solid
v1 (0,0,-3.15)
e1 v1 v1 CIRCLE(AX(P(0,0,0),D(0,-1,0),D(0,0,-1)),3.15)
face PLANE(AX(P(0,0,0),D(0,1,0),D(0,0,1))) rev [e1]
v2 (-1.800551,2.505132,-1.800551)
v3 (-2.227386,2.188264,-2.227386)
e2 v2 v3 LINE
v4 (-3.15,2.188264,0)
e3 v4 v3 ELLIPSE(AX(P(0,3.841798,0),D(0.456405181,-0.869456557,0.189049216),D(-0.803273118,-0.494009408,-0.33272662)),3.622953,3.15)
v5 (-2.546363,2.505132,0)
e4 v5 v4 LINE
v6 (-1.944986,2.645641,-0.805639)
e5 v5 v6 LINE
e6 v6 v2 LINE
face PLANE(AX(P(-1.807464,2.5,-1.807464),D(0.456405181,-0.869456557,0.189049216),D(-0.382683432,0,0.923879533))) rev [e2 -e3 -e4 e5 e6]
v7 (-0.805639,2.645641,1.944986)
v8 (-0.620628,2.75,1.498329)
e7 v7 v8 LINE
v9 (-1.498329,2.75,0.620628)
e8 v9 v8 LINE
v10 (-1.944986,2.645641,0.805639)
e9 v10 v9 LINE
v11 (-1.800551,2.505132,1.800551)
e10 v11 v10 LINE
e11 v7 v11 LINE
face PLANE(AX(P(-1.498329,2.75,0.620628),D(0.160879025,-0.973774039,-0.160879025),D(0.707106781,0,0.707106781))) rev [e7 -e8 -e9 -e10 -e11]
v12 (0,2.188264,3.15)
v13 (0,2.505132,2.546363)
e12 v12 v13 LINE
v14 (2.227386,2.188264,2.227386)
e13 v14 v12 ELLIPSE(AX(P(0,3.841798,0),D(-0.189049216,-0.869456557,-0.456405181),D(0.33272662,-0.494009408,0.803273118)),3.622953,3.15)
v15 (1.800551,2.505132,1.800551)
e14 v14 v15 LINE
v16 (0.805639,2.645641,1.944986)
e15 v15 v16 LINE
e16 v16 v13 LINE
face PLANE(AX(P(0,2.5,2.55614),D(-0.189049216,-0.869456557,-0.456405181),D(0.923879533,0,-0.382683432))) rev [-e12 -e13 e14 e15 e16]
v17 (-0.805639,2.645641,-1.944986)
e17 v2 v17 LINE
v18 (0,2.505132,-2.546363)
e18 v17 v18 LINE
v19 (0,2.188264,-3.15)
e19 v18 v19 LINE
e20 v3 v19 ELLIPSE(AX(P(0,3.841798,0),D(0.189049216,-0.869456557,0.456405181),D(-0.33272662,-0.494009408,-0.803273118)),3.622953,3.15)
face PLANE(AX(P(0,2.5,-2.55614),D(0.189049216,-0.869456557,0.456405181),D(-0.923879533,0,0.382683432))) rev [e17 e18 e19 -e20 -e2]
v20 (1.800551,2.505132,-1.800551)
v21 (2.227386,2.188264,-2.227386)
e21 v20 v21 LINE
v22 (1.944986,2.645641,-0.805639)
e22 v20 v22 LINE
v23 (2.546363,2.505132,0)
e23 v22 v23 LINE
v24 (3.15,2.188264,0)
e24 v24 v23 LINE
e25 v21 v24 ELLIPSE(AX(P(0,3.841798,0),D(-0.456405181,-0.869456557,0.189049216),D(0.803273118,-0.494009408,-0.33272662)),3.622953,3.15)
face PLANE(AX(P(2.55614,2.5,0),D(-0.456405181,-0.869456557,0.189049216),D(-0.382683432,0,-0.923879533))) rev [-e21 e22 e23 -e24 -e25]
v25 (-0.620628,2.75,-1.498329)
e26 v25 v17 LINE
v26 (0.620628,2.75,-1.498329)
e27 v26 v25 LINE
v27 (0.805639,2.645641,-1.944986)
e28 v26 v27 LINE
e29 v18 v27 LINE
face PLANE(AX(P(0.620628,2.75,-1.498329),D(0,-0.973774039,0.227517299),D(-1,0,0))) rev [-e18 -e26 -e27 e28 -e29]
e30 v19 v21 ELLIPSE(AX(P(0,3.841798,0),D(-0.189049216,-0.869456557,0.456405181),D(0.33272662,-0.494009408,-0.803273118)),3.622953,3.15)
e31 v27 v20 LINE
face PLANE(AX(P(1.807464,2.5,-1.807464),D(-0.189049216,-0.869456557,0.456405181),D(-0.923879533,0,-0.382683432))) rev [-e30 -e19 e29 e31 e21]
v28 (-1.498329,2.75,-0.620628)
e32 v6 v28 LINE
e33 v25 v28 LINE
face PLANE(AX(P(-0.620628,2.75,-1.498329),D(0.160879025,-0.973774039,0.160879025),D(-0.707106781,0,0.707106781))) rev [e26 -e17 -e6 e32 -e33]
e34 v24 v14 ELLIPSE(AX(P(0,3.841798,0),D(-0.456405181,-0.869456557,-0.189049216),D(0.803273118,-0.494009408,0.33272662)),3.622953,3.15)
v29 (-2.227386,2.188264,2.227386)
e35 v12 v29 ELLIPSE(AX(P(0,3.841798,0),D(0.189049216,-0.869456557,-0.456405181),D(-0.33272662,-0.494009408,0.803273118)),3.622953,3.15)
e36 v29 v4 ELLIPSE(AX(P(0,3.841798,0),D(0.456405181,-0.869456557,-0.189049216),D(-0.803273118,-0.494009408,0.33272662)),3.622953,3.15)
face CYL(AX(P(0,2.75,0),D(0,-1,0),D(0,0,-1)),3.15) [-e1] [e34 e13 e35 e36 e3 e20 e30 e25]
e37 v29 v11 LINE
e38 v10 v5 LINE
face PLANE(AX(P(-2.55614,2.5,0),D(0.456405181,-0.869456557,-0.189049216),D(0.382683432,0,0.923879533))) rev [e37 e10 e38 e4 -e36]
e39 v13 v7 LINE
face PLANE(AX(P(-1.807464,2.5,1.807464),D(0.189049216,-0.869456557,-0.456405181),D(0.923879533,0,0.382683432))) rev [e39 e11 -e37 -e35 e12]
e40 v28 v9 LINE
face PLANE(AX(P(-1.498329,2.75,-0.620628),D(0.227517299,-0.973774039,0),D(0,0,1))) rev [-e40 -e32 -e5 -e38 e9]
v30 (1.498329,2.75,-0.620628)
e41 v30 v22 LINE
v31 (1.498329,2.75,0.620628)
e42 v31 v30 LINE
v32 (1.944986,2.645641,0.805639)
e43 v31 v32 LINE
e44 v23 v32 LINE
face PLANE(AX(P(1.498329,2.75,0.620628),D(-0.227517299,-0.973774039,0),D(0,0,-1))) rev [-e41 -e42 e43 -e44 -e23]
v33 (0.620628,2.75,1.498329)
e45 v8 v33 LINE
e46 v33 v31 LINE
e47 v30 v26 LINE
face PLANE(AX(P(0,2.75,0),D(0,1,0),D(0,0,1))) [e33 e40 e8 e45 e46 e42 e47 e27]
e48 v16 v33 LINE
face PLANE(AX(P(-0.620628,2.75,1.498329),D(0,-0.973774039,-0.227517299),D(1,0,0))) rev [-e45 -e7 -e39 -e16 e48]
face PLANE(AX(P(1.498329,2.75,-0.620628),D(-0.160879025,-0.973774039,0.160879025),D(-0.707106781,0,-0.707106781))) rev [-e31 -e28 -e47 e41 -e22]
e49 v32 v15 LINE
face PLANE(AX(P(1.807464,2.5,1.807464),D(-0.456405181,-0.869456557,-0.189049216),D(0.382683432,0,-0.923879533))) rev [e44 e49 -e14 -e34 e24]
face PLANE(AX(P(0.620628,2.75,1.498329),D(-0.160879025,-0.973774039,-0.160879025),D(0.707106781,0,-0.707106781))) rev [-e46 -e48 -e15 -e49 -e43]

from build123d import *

# Parameters (mm, degrees)
SKETCH1_R           = 3.25
BOSS_EXTRUDE1_DEPTH = 4
BOSS_EXTRUDE2_DEPTH = 1
CHAMFER1_SIZE       = 0.88
CHAMFER1_SIZE_2     = 1
BOSS_EXTRUDE3_DEPTH = 0.5
CHAMFER2_SIZE       = 1.07
CHAMFER2_SIZE_2     = 0.5
SCALE1_SCALE_X      = 1
SCALE1_SCALE_Y      = 0.5
SCALE1_SCALE_Z      = 1
SKETCH4_R           = 3.45
SKETCH4_R_2         = 3.15
CUT_EXTRUDE1_DEPTH  = 6.356071494


with BuildPart() as part:
    # Sketch1 → Boss-Extrude1 (new body)
    with BuildSketch(Plane(origin=(0, 0, 0), x_dir=(1, 0, 0), z_dir=(0, 1, 0))):
        with Locations(Location((0, 0, 0), (0, 0, 270))):
            Circle(SKETCH1_R)
    extrude(amount=BOSS_EXTRUDE1_DEPTH)

    # Sketch2 → Boss-Extrude2 (add)
    with BuildSketch(Plane(origin=(0, 4, 0), x_dir=(1, 0, 0), z_dir=(0, 1, 0))):
        Polygon((0, 2.556139813), (-1.807463795, 1.807463795), (-2.556139813, 0), (-1.807463795, -1.807463795), (0, -2.556139813), (1.807463795, -1.807463795), (2.556139813, 0), (1.807463795, 1.807463795), align=None)
    extrude(amount=BOSS_EXTRUDE2_DEPTH)

    # Chamfer1
    # the kernel refuses this chamfer: 1, 0.88 mm, written as the material it adds along each edge
    with BuildSketch(Plane(origin=(-4.18730229, 4, 0.821702415), x_dir=(-0.38268343236508967, 0, 0.9238795325112867), z_dir=(0.9238795325112868, 0, 0.38268343236508967))) as chamfer1_piece_1_section:
        Polygon((CHAMFER1_SIZE, 0), (0, -CHAMFER1_SIZE_2), (0, 0), align=None)
    chamfer1_piece_1 = extrude(amount=7.108221963, mode=Mode.PRIVATE)
    chamfer1_piece_1 = chamfer1_piece_1 & Plane(origin=(0, 4, 0), x_dir=(0, 0, 1), z_dir=(0, -1, 0)) * Cylinder(3.25, 19, mode=Mode.PRIVATE)
    chamfer1_piece_1 = split(chamfer1_piece_1, bisect_by=Plane(origin=(-2.504502352, 4, 0.124663858), z_dir=(0.9238795325112868, 0, -0.38268343236508956)), keep=Keep.TOP, mode=Mode.PRIVATE)
    chamfer1_piece_1 = split(chamfer1_piece_1, bisect_by=Plane(origin=(-2.960869844, 4, 3.782572258), z_dir=(-0.38268343236508945, 0, -0.9238795325112868)), keep=Keep.TOP, mode=Mode.PRIVATE)
    chamfer1_piece_1 = split(chamfer1_piece_1, bisect_by=Plane(origin=(-4.18730229, 5, 0.821702415), z_dir=(0, -1, 0)), keep=Keep.TOP, mode=Mode.PRIVATE)
    add(chamfer1_piece_1)
    with BuildSketch(Plane(origin=(-3.541901193, 4, -2.379838494), x_dir=(-0.9238795325112868, 0, 0.38268343236508956), z_dir=(0.38268343236508956, 0, 0.9238795325112868))) as chamfer1_piece_2_section:
        Polygon((CHAMFER1_SIZE, 0), (0, -CHAMFER1_SIZE_2), (0, 0), align=None)
    chamfer1_piece_2 = extrude(amount=7.108221963, mode=Mode.PRIVATE)
    chamfer1_piece_2 = chamfer1_piece_2 & Plane(origin=(0, 4, 0), x_dir=(0, 0, 1), z_dir=(0, -1, 0)) * Cylinder(3.25, 19, mode=Mode.PRIVATE)
    chamfer1_piece_2 = split(chamfer1_piece_2, bisect_by=Plane(origin=(-1.859101256, 4, -1.682799937), z_dir=(0.923879532511287, 0, 0.3826834323650895)), keep=Keep.TOP, mode=Mode.PRIVATE)
    chamfer1_piece_2 = split(chamfer1_piece_2, bisect_by=Plane(origin=(-4.768333639, 4, 0.581031349), z_dir=(0.38268343236508967, 0, -0.9238795325112868)), keep=Keep.TOP, mode=Mode.PRIVATE)
    chamfer1_piece_2 = split(chamfer1_piece_2, bisect_by=Plane(origin=(-3.541901193, 5, -2.379838494), z_dir=(0, -1, 0)), keep=Keep.TOP, mode=Mode.PRIVATE)
    add(chamfer1_piece_2)
    with BuildSketch(Plane(origin=(-0.821702415, 4, -4.18730229), x_dir=(-0.9238795325112868, 0, -0.3826834323650895), z_dir=(-0.3826834323650895, 0, 0.923879532511287))) as chamfer1_piece_3_section:
        Polygon((CHAMFER1_SIZE, 0), (0, -CHAMFER1_SIZE_2), (0, 0), align=None)
    chamfer1_piece_3 = extrude(amount=7.108221963, mode=Mode.PRIVATE)
    chamfer1_piece_3 = chamfer1_piece_3 & Plane(origin=(0, 4, 0), x_dir=(0, 0, 1), z_dir=(0, -1, 0)) * Cylinder(3.25, 19, mode=Mode.PRIVATE)
    chamfer1_piece_3 = split(chamfer1_piece_3, bisect_by=Plane(origin=(-0.124663858, 4, -2.504502352), z_dir=(0.38268343236508945, 0, 0.923879532511287)), keep=Keep.TOP, mode=Mode.PRIVATE)
    chamfer1_piece_3 = split(chamfer1_piece_3, bisect_by=Plane(origin=(-3.782572258, 4, -2.960869844), z_dir=(0.9238795325112868, 0, -0.38268343236508956)), keep=Keep.TOP, mode=Mode.PRIVATE)
    chamfer1_piece_3 = split(chamfer1_piece_3, bisect_by=Plane(origin=(-0.821702415, 5, -4.18730229), z_dir=(0, -1, 0)), keep=Keep.TOP, mode=Mode.PRIVATE)
    add(chamfer1_piece_3)
    with BuildSketch(Plane(origin=(2.379838494, 4, -3.541901193), x_dir=(-0.38268343236508945, 0, -0.923879532511287), z_dir=(-0.923879532511287, 0, 0.38268343236508945))) as chamfer1_piece_4_section:
        Polygon((CHAMFER1_SIZE, 0), (0, -CHAMFER1_SIZE_2), (0, 0), align=None)
    chamfer1_piece_4 = extrude(amount=7.108221963, mode=Mode.PRIVATE)
    chamfer1_piece_4 = chamfer1_piece_4 & Plane(origin=(0, 4, 0), x_dir=(0, 0, 1), z_dir=(0, -1, 0)) * Cylinder(3.25, 19, mode=Mode.PRIVATE)
    chamfer1_piece_4 = split(chamfer1_piece_4, bisect_by=Plane(origin=(1.682799937, 4, -1.859101256), z_dir=(-0.3826834323650897, 0, 0.9238795325112867)), keep=Keep.TOP, mode=Mode.PRIVATE)
    chamfer1_piece_4 = split(chamfer1_piece_4, bisect_by=Plane(origin=(-0.581031349, 4, -4.768333639), z_dir=(0.923879532511287, 0, 0.3826834323650895)), keep=Keep.TOP, mode=Mode.PRIVATE)
    chamfer1_piece_4 = split(chamfer1_piece_4, bisect_by=Plane(origin=(2.379838494, 5, -3.541901193), z_dir=(0, -1, 0)), keep=Keep.TOP, mode=Mode.PRIVATE)
    add(chamfer1_piece_4)
    with BuildSketch(Plane(origin=(4.18730229, 4, -0.821702415), x_dir=(0.3826834323650897, 0, -0.9238795325112867), z_dir=(-0.9238795325112868, 0, -0.3826834323650898))) as chamfer1_piece_5_section:
        Polygon((CHAMFER1_SIZE, 0), (0, -CHAMFER1_SIZE_2), (0, 0), align=None)
    chamfer1_piece_5 = extrude(amount=7.108221963, mode=Mode.PRIVATE)
    chamfer1_piece_5 = chamfer1_piece_5 & Plane(origin=(0, 4, 0), x_dir=(0, 0, 1), z_dir=(0, -1, 0)) * Cylinder(3.25, 19, mode=Mode.PRIVATE)
    chamfer1_piece_5 = split(chamfer1_piece_5, bisect_by=Plane(origin=(2.960869844, 4, -3.782572258), z_dir=(0.38268343236508945, 0, 0.923879532511287)), keep=Keep.TOP, mode=Mode.PRIVATE)
    chamfer1_piece_5 = split(chamfer1_piece_5, bisect_by=Plane(origin=(2.504502352, 4, -0.124663858), z_dir=(-0.923879532511287, 0, 0.3826834323650893)), keep=Keep.TOP, mode=Mode.PRIVATE)
    chamfer1_piece_5 = split(chamfer1_piece_5, bisect_by=Plane(origin=(4.18730229, 5, -0.821702415), z_dir=(0, -1, 0)), keep=Keep.TOP, mode=Mode.PRIVATE)
    add(chamfer1_piece_5)
    with BuildSketch(Plane(origin=(3.541901193, 4, 2.379838494), x_dir=(0.9238795325112868, 0, -0.3826834323650893), z_dir=(-0.3826834323650893, 0, -0.923879532511287))) as chamfer1_piece_6_section:
        Polygon((CHAMFER1_SIZE, 0), (0, -CHAMFER1_SIZE_2), (0, 0), align=None)
    chamfer1_piece_6 = extrude(amount=7.108221963, mode=Mode.PRIVATE)
    chamfer1_piece_6 = chamfer1_piece_6 & Plane(origin=(0, 4, 0), x_dir=(0, 0, 1), z_dir=(0, -1, 0)) * Cylinder(3.25, 19, mode=Mode.PRIVATE)
    chamfer1_piece_6 = split(chamfer1_piece_6, bisect_by=Plane(origin=(1.859101256, 4, 1.682799937), z_dir=(-0.9238795325112867, 0, -0.3826834323650898)), keep=Keep.TOP, mode=Mode.PRIVATE)
    chamfer1_piece_6 = split(chamfer1_piece_6, bisect_by=Plane(origin=(4.768333639, 4, -0.581031349), z_dir=(-0.3826834323650897, 0, 0.9238795325112867)), keep=Keep.TOP, mode=Mode.PRIVATE)
    chamfer1_piece_6 = split(chamfer1_piece_6, bisect_by=Plane(origin=(3.541901193, 5, 2.379838494), z_dir=(0, -1, 0)), keep=Keep.TOP, mode=Mode.PRIVATE)
    add(chamfer1_piece_6)
    with BuildSketch(Plane(origin=(0.821702415, 4, 4.18730229), x_dir=(0.9238795325112867, 0, 0.3826834323650898), z_dir=(0.3826834323650898, 0, -0.9238795325112867))) as chamfer1_piece_7_section:
        Polygon((CHAMFER1_SIZE, 0), (0, -CHAMFER1_SIZE_2), (0, 0), align=None)
    chamfer1_piece_7 = extrude(amount=7.108221963, mode=Mode.PRIVATE)
    chamfer1_piece_7 = chamfer1_piece_7 & Plane(origin=(0, 4, 0), x_dir=(0, 0, 1), z_dir=(0, -1, 0)) * Cylinder(3.25, 19, mode=Mode.PRIVATE)
    chamfer1_piece_7 = split(chamfer1_piece_7, bisect_by=Plane(origin=(0.124663858, 4, 2.504502352), z_dir=(-0.38268343236508945, 0, -0.9238795325112868)), keep=Keep.TOP, mode=Mode.PRIVATE)
    chamfer1_piece_7 = split(chamfer1_piece_7, bisect_by=Plane(origin=(3.782572258, 4, 2.960869844), z_dir=(-0.923879532511287, 0, 0.3826834323650893)), keep=Keep.TOP, mode=Mode.PRIVATE)
    chamfer1_piece_7 = split(chamfer1_piece_7, bisect_by=Plane(origin=(0.821702415, 5, 4.18730229), z_dir=(0, -1, 0)), keep=Keep.TOP, mode=Mode.PRIVATE)
    add(chamfer1_piece_7)
    with BuildSketch(Plane(origin=(-2.379838494, 4, 3.541901193), x_dir=(0.3826834323650895, 0, 0.9238795325112868), z_dir=(0.923879532511287, 0, -0.3826834323650895))) as chamfer1_piece_8_section:
        Polygon((CHAMFER1_SIZE, 0), (0, -CHAMFER1_SIZE_2), (0, 0), align=None)
    chamfer1_piece_8 = extrude(amount=7.108221963, mode=Mode.PRIVATE)
    chamfer1_piece_8 = chamfer1_piece_8 & Plane(origin=(0, 4, 0), x_dir=(0, 0, 1), z_dir=(0, -1, 0)) * Cylinder(3.25, 19, mode=Mode.PRIVATE)
    chamfer1_piece_8 = split(chamfer1_piece_8, bisect_by=Plane(origin=(-1.682799937, 4, 1.859101256), z_dir=(0.38268343236508967, 0, -0.9238795325112868)), keep=Keep.TOP, mode=Mode.PRIVATE)
    chamfer1_piece_8 = split(chamfer1_piece_8, bisect_by=Plane(origin=(0.581031349, 4, 4.768333639), z_dir=(-0.9238795325112867, 0, -0.3826834323650898)), keep=Keep.TOP, mode=Mode.PRIVATE)
    chamfer1_piece_8 = split(chamfer1_piece_8, bisect_by=Plane(origin=(-2.379838494, 5, 3.541901193), z_dir=(0, -1, 0)), keep=Keep.TOP, mode=Mode.PRIVATE)
    add(chamfer1_piece_8)
    with BuildSketch(Plane(origin=(-3.541901193, 4, -2.379838494), x_dir=(-0.9238795325112868, 0, 0.38268343236508956), z_dir=(0.38268343236508956, 0, 0.9238795325112868))) as chamfer1_piece_9a_section:
        Polygon((CHAMFER1_SIZE, 0), (0, -CHAMFER1_SIZE_2), (0, 0), align=None)
    chamfer1_piece_9a = extrude(amount=7.108221963, mode=Mode.PRIVATE)
    chamfer1_piece_9a = chamfer1_piece_9a & Plane(origin=(0, 4, 0), x_dir=(0, 0, 1), z_dir=(0, -1, 0)) * Cylinder(3.25, 19, mode=Mode.PRIVATE)
    chamfer1_piece_9a = split(chamfer1_piece_9a, bisect_by=Plane(origin=(-4.768333639, 4, 0.581031349), z_dir=(-0.38268343236508967, 0, 0.9238795325112868)), keep=Keep.TOP, mode=Mode.PRIVATE)
    chamfer1_piece_9a = split(chamfer1_piece_9a, bisect_by=Plane(origin=(-3.541901193, 5, -2.379838494), z_dir=(0, -1, 0)), keep=Keep.TOP, mode=Mode.PRIVATE)
    with BuildSketch(Plane(origin=(-4.18730229, 4, 0.821702415), x_dir=(-0.38268343236508967, 0, 0.9238795325112867), z_dir=(0.9238795325112868, 0, 0.38268343236508967))) as chamfer1_piece_9b_section:
        Polygon((CHAMFER1_SIZE, 0), (0, -CHAMFER1_SIZE_2), (0, 0), align=None)
    chamfer1_piece_9b = extrude(amount=7.108221963, mode=Mode.PRIVATE)
    chamfer1_piece_9b = chamfer1_piece_9b & Plane(origin=(0, 4, 0), x_dir=(0, 0, 1), z_dir=(0, -1, 0)) * Cylinder(3.25, 19, mode=Mode.PRIVATE)
    chamfer1_piece_9b = split(chamfer1_piece_9b, bisect_by=Plane(origin=(-2.504502352, 4, 0.124663858), z_dir=(-0.9238795325112868, 0, 0.38268343236508956)), keep=Keep.TOP, mode=Mode.PRIVATE)
    chamfer1_piece_9b = split(chamfer1_piece_9b, bisect_by=Plane(origin=(-4.18730229, 5, 0.821702415), z_dir=(0, -1, 0)), keep=Keep.TOP, mode=Mode.PRIVATE)
    chamfer1_piece_9 = chamfer1_piece_9a & chamfer1_piece_9b
    add(chamfer1_piece_9)
    with BuildSketch(Plane(origin=(-4.18730229, 4, 0.821702415), x_dir=(-0.38268343236508967, 0, 0.9238795325112867), z_dir=(0.9238795325112868, 0, 0.38268343236508967))) as chamfer1_piece_10a_section:
        Polygon((CHAMFER1_SIZE, 0), (0, -CHAMFER1_SIZE_2), (0, 0), align=None)
    chamfer1_piece_10a = extrude(amount=7.108221963, mode=Mode.PRIVATE)
    chamfer1_piece_10a = chamfer1_piece_10a & Plane(origin=(0, 4, 0), x_dir=(0, 0, 1), z_dir=(0, -1, 0)) * Cylinder(3.25, 19, mode=Mode.PRIVATE)
    chamfer1_piece_10a = split(chamfer1_piece_10a, bisect_by=Plane(origin=(-2.960869844, 4, 3.782572258), z_dir=(0.38268343236508945, 0, 0.9238795325112868)), keep=Keep.TOP, mode=Mode.PRIVATE)
    chamfer1_piece_10a = split(chamfer1_piece_10a, bisect_by=Plane(origin=(-4.18730229, 5, 0.821702415), z_dir=(0, -1, 0)), keep=Keep.TOP, mode=Mode.PRIVATE)
    with BuildSketch(Plane(origin=(-2.379838494, 4, 3.541901193), x_dir=(0.3826834323650895, 0, 0.9238795325112868), z_dir=(0.923879532511287, 0, -0.3826834323650895))) as chamfer1_piece_10b_section:
        Polygon((CHAMFER1_SIZE, 0), (0, -CHAMFER1_SIZE_2), (0, 0), align=None)
    chamfer1_piece_10b = extrude(amount=7.108221963, mode=Mode.PRIVATE)
    chamfer1_piece_10b = chamfer1_piece_10b & Plane(origin=(0, 4, 0), x_dir=(0, 0, 1), z_dir=(0, -1, 0)) * Cylinder(3.25, 19, mode=Mode.PRIVATE)
    chamfer1_piece_10b = split(chamfer1_piece_10b, bisect_by=Plane(origin=(-1.682799937, 4, 1.859101256), z_dir=(-0.38268343236508967, 0, 0.9238795325112868)), keep=Keep.TOP, mode=Mode.PRIVATE)
    chamfer1_piece_10b = split(chamfer1_piece_10b, bisect_by=Plane(origin=(-2.379838494, 5, 3.541901193), z_dir=(0, -1, 0)), keep=Keep.TOP, mode=Mode.PRIVATE)
    chamfer1_piece_10 = chamfer1_piece_10a & chamfer1_piece_10b
    add(chamfer1_piece_10)
    with BuildSketch(Plane(origin=(-0.821702415, 4, -4.18730229), x_dir=(-0.9238795325112868, 0, -0.3826834323650895), z_dir=(-0.3826834323650895, 0, 0.923879532511287))) as chamfer1_piece_11a_section:
        Polygon((CHAMFER1_SIZE, 0), (0, -CHAMFER1_SIZE_2), (0, 0), align=None)
    chamfer1_piece_11a = extrude(amount=7.108221963, mode=Mode.PRIVATE)
    chamfer1_piece_11a = chamfer1_piece_11a & Plane(origin=(0, 4, 0), x_dir=(0, 0, 1), z_dir=(0, -1, 0)) * Cylinder(3.25, 19, mode=Mode.PRIVATE)
    chamfer1_piece_11a = split(chamfer1_piece_11a, bisect_by=Plane(origin=(-3.782572258, 4, -2.960869844), z_dir=(-0.9238795325112868, 0, 0.38268343236508956)), keep=Keep.TOP, mode=Mode.PRIVATE)
    chamfer1_piece_11a = split(chamfer1_piece_11a, bisect_by=Plane(origin=(-0.821702415, 5, -4.18730229), z_dir=(0, -1, 0)), keep=Keep.TOP, mode=Mode.PRIVATE)
    with BuildSketch(Plane(origin=(-3.541901193, 4, -2.379838494), x_dir=(-0.9238795325112868, 0, 0.38268343236508956), z_dir=(0.38268343236508956, 0, 0.9238795325112868))) as chamfer1_piece_11b_section:
        Polygon((CHAMFER1_SIZE, 0), (0, -CHAMFER1_SIZE_2), (0, 0), align=None)
    chamfer1_piece_11b = extrude(amount=7.108221963, mode=Mode.PRIVATE)
    chamfer1_piece_11b = chamfer1_piece_11b & Plane(origin=(0, 4, 0), x_dir=(0, 0, 1), z_dir=(0, -1, 0)) * Cylinder(3.25, 19, mode=Mode.PRIVATE)
    chamfer1_piece_11b = split(chamfer1_piece_11b, bisect_by=Plane(origin=(-1.859101256, 4, -1.682799937), z_dir=(-0.923879532511287, 0, -0.3826834323650895)), keep=Keep.TOP, mode=Mode.PRIVATE)
    chamfer1_piece_11b = split(chamfer1_piece_11b, bisect_by=Plane(origin=(-3.541901193, 5, -2.379838494), z_dir=(0, -1, 0)), keep=Keep.TOP, mode=Mode.PRIVATE)
    chamfer1_piece_11 = chamfer1_piece_11a & chamfer1_piece_11b
    add(chamfer1_piece_11)
    with BuildSketch(Plane(origin=(2.379838494, 4, -3.541901193), x_dir=(-0.38268343236508945, 0, -0.923879532511287), z_dir=(-0.923879532511287, 0, 0.38268343236508945))) as chamfer1_piece_12a_section:
        Polygon((CHAMFER1_SIZE, 0), (0, -CHAMFER1_SIZE_2), (0, 0), align=None)
    chamfer1_piece_12a = extrude(amount=7.108221963, mode=Mode.PRIVATE)
    chamfer1_piece_12a = chamfer1_piece_12a & Plane(origin=(0, 4, 0), x_dir=(0, 0, 1), z_dir=(0, -1, 0)) * Cylinder(3.25, 19, mode=Mode.PRIVATE)
    chamfer1_piece_12a = split(chamfer1_piece_12a, bisect_by=Plane(origin=(-0.581031349, 4, -4.768333639), z_dir=(-0.923879532511287, 0, -0.3826834323650895)), keep=Keep.TOP, mode=Mode.PRIVATE)
    chamfer1_piece_12a = split(chamfer1_piece_12a, bisect_by=Plane(origin=(2.379838494, 5, -3.541901193), z_dir=(0, -1, 0)), keep=Keep.TOP, mode=Mode.PRIVATE)
    with BuildSketch(Plane(origin=(-0.821702415, 4, -4.18730229), x_dir=(-0.9238795325112868, 0, -0.3826834323650895), z_dir=(-0.3826834323650895, 0, 0.923879532511287))) as chamfer1_piece_12b_section:
        Polygon((CHAMFER1_SIZE, 0), (0, -CHAMFER1_SIZE_2), (0, 0), align=None)
    chamfer1_piece_12b = extrude(amount=7.108221963, mode=Mode.PRIVATE)
    chamfer1_piece_12b = chamfer1_piece_12b & Plane(origin=(0, 4, 0), x_dir=(0, 0, 1), z_dir=(0, -1, 0)) * Cylinder(3.25, 19, mode=Mode.PRIVATE)
    chamfer1_piece_12b = split(chamfer1_piece_12b, bisect_by=Plane(origin=(-0.124663858, 4, -2.504502352), z_dir=(-0.38268343236508945, 0, -0.923879532511287)), keep=Keep.TOP, mode=Mode.PRIVATE)
    chamfer1_piece_12b = split(chamfer1_piece_12b, bisect_by=Plane(origin=(-0.821702415, 5, -4.18730229), z_dir=(0, -1, 0)), keep=Keep.TOP, mode=Mode.PRIVATE)
    chamfer1_piece_12 = chamfer1_piece_12a & chamfer1_piece_12b
    add(chamfer1_piece_12)
    with BuildSketch(Plane(origin=(2.379838494, 4, -3.541901193), x_dir=(-0.38268343236508945, 0, -0.923879532511287), z_dir=(-0.923879532511287, 0, 0.38268343236508945))) as chamfer1_piece_13a_section:
        Polygon((CHAMFER1_SIZE, 0), (0, -CHAMFER1_SIZE_2), (0, 0), align=None)
    chamfer1_piece_13a = extrude(amount=7.108221963, mode=Mode.PRIVATE)
    chamfer1_piece_13a = chamfer1_piece_13a & Plane(origin=(0, 4, 0), x_dir=(0, 0, 1), z_dir=(0, -1, 0)) * Cylinder(3.25, 19, mode=Mode.PRIVATE)
    chamfer1_piece_13a = split(chamfer1_piece_13a, bisect_by=Plane(origin=(1.682799937, 4, -1.859101256), z_dir=(0.3826834323650897, 0, -0.9238795325112867)), keep=Keep.TOP, mode=Mode.PRIVATE)
    chamfer1_piece_13a = split(chamfer1_piece_13a, bisect_by=Plane(origin=(2.379838494, 5, -3.541901193), z_dir=(0, -1, 0)), keep=Keep.TOP, mode=Mode.PRIVATE)
    with BuildSketch(Plane(origin=(4.18730229, 4, -0.821702415), x_dir=(0.3826834323650897, 0, -0.9238795325112867), z_dir=(-0.9238795325112868, 0, -0.3826834323650898))) as chamfer1_piece_13b_section:
        Polygon((CHAMFER1_SIZE, 0), (0, -CHAMFER1_SIZE_2), (0, 0), align=None)
    chamfer1_piece_13b = extrude(amount=7.108221963, mode=Mode.PRIVATE)
    chamfer1_piece_13b = chamfer1_piece_13b & Plane(origin=(0, 4, 0), x_dir=(0, 0, 1), z_dir=(0, -1, 0)) * Cylinder(3.25, 19, mode=Mode.PRIVATE)
    chamfer1_piece_13b = split(chamfer1_piece_13b, bisect_by=Plane(origin=(2.960869844, 4, -3.782572258), z_dir=(-0.38268343236508945, 0, -0.923879532511287)), keep=Keep.TOP, mode=Mode.PRIVATE)
    chamfer1_piece_13b = split(chamfer1_piece_13b, bisect_by=Plane(origin=(4.18730229, 5, -0.821702415), z_dir=(0, -1, 0)), keep=Keep.TOP, mode=Mode.PRIVATE)
    chamfer1_piece_13 = chamfer1_piece_13a & chamfer1_piece_13b
    add(chamfer1_piece_13)
    with BuildSketch(Plane(origin=(3.541901193, 4, 2.379838494), x_dir=(0.9238795325112868, 0, -0.3826834323650893), z_dir=(-0.3826834323650893, 0, -0.923879532511287))) as chamfer1_piece_14a_section:
        Polygon((CHAMFER1_SIZE, 0), (0, -CHAMFER1_SIZE_2), (0, 0), align=None)
    chamfer1_piece_14a = extrude(amount=7.108221963, mode=Mode.PRIVATE)
    chamfer1_piece_14a = chamfer1_piece_14a & Plane(origin=(0, 4, 0), x_dir=(0, 0, 1), z_dir=(0, -1, 0)) * Cylinder(3.25, 19, mode=Mode.PRIVATE)
    chamfer1_piece_14a = split(chamfer1_piece_14a, bisect_by=Plane(origin=(4.768333639, 4, -0.581031349), z_dir=(0.3826834323650897, 0, -0.9238795325112867)), keep=Keep.TOP, mode=Mode.PRIVATE)
    chamfer1_piece_14a = split(chamfer1_piece_14a, bisect_by=Plane(origin=(3.541901193, 5, 2.379838494), z_dir=(0, -1, 0)), keep=Keep.TOP, mode=Mode.PRIVATE)
    with BuildSketch(Plane(origin=(4.18730229, 4, -0.821702415), x_dir=(0.3826834323650897, 0, -0.9238795325112867), z_dir=(-0.9238795325112868, 0, -0.3826834323650898))) as chamfer1_piece_14b_section:
        Polygon((CHAMFER1_SIZE, 0), (0, -CHAMFER1_SIZE_2), (0, 0), align=None)
    chamfer1_piece_14b = extrude(amount=7.108221963, mode=Mode.PRIVATE)
    chamfer1_piece_14b = chamfer1_piece_14b & Plane(origin=(0, 4, 0), x_dir=(0, 0, 1), z_dir=(0, -1, 0)) * Cylinder(3.25, 19, mode=Mode.PRIVATE)
    chamfer1_piece_14b = split(chamfer1_piece_14b, bisect_by=Plane(origin=(2.504502352, 4, -0.124663858), z_dir=(0.923879532511287, 0, -0.3826834323650893)), keep=Keep.TOP, mode=Mode.PRIVATE)
    chamfer1_piece_14b = split(chamfer1_piece_14b, bisect_by=Plane(origin=(4.18730229, 5, -0.821702415), z_dir=(0, -1, 0)), keep=Keep.TOP, mode=Mode.PRIVATE)
    chamfer1_piece_14 = chamfer1_piece_14a & chamfer1_piece_14b
    add(chamfer1_piece_14)
    with BuildSketch(Plane(origin=(0.821702415, 4, 4.18730229), x_dir=(0.9238795325112867, 0, 0.3826834323650898), z_dir=(0.3826834323650898, 0, -0.9238795325112867))) as chamfer1_piece_15a_section:
        Polygon((CHAMFER1_SIZE, 0), (0, -CHAMFER1_SIZE_2), (0, 0), align=None)
    chamfer1_piece_15a = extrude(amount=7.108221963, mode=Mode.PRIVATE)
    chamfer1_piece_15a = chamfer1_piece_15a & Plane(origin=(0, 4, 0), x_dir=(0, 0, 1), z_dir=(0, -1, 0)) * Cylinder(3.25, 19, mode=Mode.PRIVATE)
    chamfer1_piece_15a = split(chamfer1_piece_15a, bisect_by=Plane(origin=(3.782572258, 4, 2.960869844), z_dir=(0.923879532511287, 0, -0.3826834323650893)), keep=Keep.TOP, mode=Mode.PRIVATE)
    chamfer1_piece_15a = split(chamfer1_piece_15a, bisect_by=Plane(origin=(0.821702415, 5, 4.18730229), z_dir=(0, -1, 0)), keep=Keep.TOP, mode=Mode.PRIVATE)
    with BuildSketch(Plane(origin=(3.541901193, 4, 2.379838494), x_dir=(0.9238795325112868, 0, -0.3826834323650893), z_dir=(-0.3826834323650893, 0, -0.923879532511287))) as chamfer1_piece_15b_section:
        Polygon((CHAMFER1_SIZE, 0), (0, -CHAMFER1_SIZE_2), (0, 0), align=None)
    chamfer1_piece_15b = extrude(amount=7.108221963, mode=Mode.PRIVATE)
    chamfer1_piece_15b = chamfer1_piece_15b & Plane(origin=(0, 4, 0), x_dir=(0, 0, 1), z_dir=(0, -1, 0)) * Cylinder(3.25, 19, mode=Mode.PRIVATE)
    chamfer1_piece_15b = split(chamfer1_piece_15b, bisect_by=Plane(origin=(1.859101256, 4, 1.682799937), z_dir=(0.9238795325112867, 0, 0.3826834323650898)), keep=Keep.TOP, mode=Mode.PRIVATE)
    chamfer1_piece_15b = split(chamfer1_piece_15b, bisect_by=Plane(origin=(3.541901193, 5, 2.379838494), z_dir=(0, -1, 0)), keep=Keep.TOP, mode=Mode.PRIVATE)
    chamfer1_piece_15 = chamfer1_piece_15a & chamfer1_piece_15b
    add(chamfer1_piece_15)
    with BuildSketch(Plane(origin=(-2.379838494, 4, 3.541901193), x_dir=(0.3826834323650895, 0, 0.9238795325112868), z_dir=(0.923879532511287, 0, -0.3826834323650895))) as chamfer1_piece_16a_section:
        Polygon((CHAMFER1_SIZE, 0), (0, -CHAMFER1_SIZE_2), (0, 0), align=None)
    chamfer1_piece_16a = extrude(amount=7.108221963, mode=Mode.PRIVATE)
    chamfer1_piece_16a = chamfer1_piece_16a & Plane(origin=(0, 4, 0), x_dir=(0, 0, 1), z_dir=(0, -1, 0)) * Cylinder(3.25, 19, mode=Mode.PRIVATE)
    chamfer1_piece_16a = split(chamfer1_piece_16a, bisect_by=Plane(origin=(0.581031349, 4, 4.768333639), z_dir=(0.9238795325112867, 0, 0.3826834323650898)), keep=Keep.TOP, mode=Mode.PRIVATE)
    chamfer1_piece_16a = split(chamfer1_piece_16a, bisect_by=Plane(origin=(-2.379838494, 5, 3.541901193), z_dir=(0, -1, 0)), keep=Keep.TOP, mode=Mode.PRIVATE)
    with BuildSketch(Plane(origin=(0.821702415, 4, 4.18730229), x_dir=(0.9238795325112867, 0, 0.3826834323650898), z_dir=(0.3826834323650898, 0, -0.9238795325112867))) as chamfer1_piece_16b_section:
        Polygon((CHAMFER1_SIZE, 0), (0, -CHAMFER1_SIZE_2), (0, 0), align=None)
    chamfer1_piece_16b = extrude(amount=7.108221963, mode=Mode.PRIVATE)
    chamfer1_piece_16b = chamfer1_piece_16b & Plane(origin=(0, 4, 0), x_dir=(0, 0, 1), z_dir=(0, -1, 0)) * Cylinder(3.25, 19, mode=Mode.PRIVATE)
    chamfer1_piece_16b = split(chamfer1_piece_16b, bisect_by=Plane(origin=(0.124663858, 4, 2.504502352), z_dir=(0.38268343236508945, 0, 0.9238795325112868)), keep=Keep.TOP, mode=Mode.PRIVATE)
    chamfer1_piece_16b = split(chamfer1_piece_16b, bisect_by=Plane(origin=(0.821702415, 5, 4.18730229), z_dir=(0, -1, 0)), keep=Keep.TOP, mode=Mode.PRIVATE)
    chamfer1_piece_16 = chamfer1_piece_16a & chamfer1_piece_16b
    add(chamfer1_piece_16)

    # Sketch3 → Boss-Extrude3 (add)
    with BuildSketch(Plane(origin=(0, 5, 0), x_dir=(1, 0, 0), z_dir=(0, 1, 0))):
        Polygon((-0.620628059, 1.498328678), (-1.498328678, 0.620628059), (-1.498328678, -0.620628059), (-0.620628059, -1.498328678), (0.620628059, -1.498328678), (1.498328678, -0.620628059), (1.498328678, 0.620628059), (0.620628059, 1.498328678), align=None)
    extrude(amount=BOSS_EXTRUDE3_DEPTH)

    # Chamfer2
    # the kernel refuses this chamfer: 1.07, 0.5 mm, written as the material it adds along each edge
    with BuildSketch(Plane(origin=(-3.458646846, 5, -1.339690109), x_dir=(-0.7071067811865447, 0, 0.7071067811865505), z_dir=(0.7071067811865505, 0, 0.7071067811865447))) as chamfer2_piece_1_section:
        Polygon((CHAMFER2_SIZE, 0), (0, -CHAMFER2_SIZE_2), (0, 0), align=None)
    chamfer2_piece_1 = extrude(amount=6.785873199, mode=Mode.PRIVATE)
    chamfer2_piece_1 = split(chamfer2_piece_1, bisect_by=Plane(origin=(-2.396940928, 7.441446714, 1.223494718), z_dir=(-0.2872856253788866, -0.6606278948920248, -0.6935688530644915)), keep=Keep.TOP, mode=Mode.PRIVATE)
    chamfer2_piece_1 = split(chamfer2_piece_1, bisect_by=Plane(origin=(-3.949447553, 6.128621167, -0.154792386), z_dir=(0.2872856253788866, -0.6606278948920248, -0.6935688530644915)), keep=Keep.TOP, mode=Mode.PRIVATE)
    chamfer2_piece_1 = split(chamfer2_piece_1, bisect_by=Plane(origin=(-2.757570472, 4.332221152, -1.049294767), z_dir=(0.6935688530644915, -0.6606278948920248, 0.2872856253788866)), keep=Keep.TOP, mode=Mode.PRIVATE)
    chamfer2_piece_1 = split(chamfer2_piece_1, bisect_by=Plane(origin=(-3.291443308, 4.840737771, -1.408948083), z_dir=(0.6935688530644915, -0.6606278948920248, -0.2872856253788866)), keep=Keep.TOP, mode=Mode.PRIVATE)
    chamfer2_piece_1 = split(chamfer2_piece_1, bisect_by=Plane(origin=(-3.29908018, 4.658527335, -1.339690109), z_dir=(0.42334893073604385, -0.9059667117751339, -1.0602427859705562e-15)), keep=Keep.TOP, mode=Mode.PRIVATE)
    chamfer2_piece_1 = split(chamfer2_piece_1, bisect_by=Plane(origin=(-3.458646846, 6.498881677, -0.639278111), z_dir=(-2.49914370978774e-15, -0.9059667117751338, -0.42334893073604396)), keep=Keep.TOP, mode=Mode.PRIVATE)
    add(chamfer2_piece_1)
    with BuildSketch(Plane(origin=(-1.498328678, 5, -3.3929366), x_dir=(-1, 0, 0), z_dir=(0, 0, 1))) as chamfer2_piece_2_section:
        Polygon((CHAMFER2_SIZE, 0), (0, -CHAMFER2_SIZE_2), (0, 0), align=None)
    chamfer2_piece_2 = extrude(amount=6.785873199, mode=Mode.PRIVATE)
    chamfer2_piece_2 = split(chamfer2_piece_2, bisect_by=Plane(origin=(-2.560034596, 7.441446714, -0.829751772), z_dir=(0.2872856253788866, -0.6606278948920248, -0.6935688530644915)), keep=Keep.TOP, mode=Mode.PRIVATE)
    chamfer2_piece_2 = split(chamfer2_piece_2, bisect_by=Plane(origin=(-1.207933335, 4.332221152, -2.691860225), z_dir=(0.2872856253788866, -0.6606278948920248, 0.6935688530644915)), keep=Keep.TOP, mode=Mode.PRIVATE)
    chamfer2_piece_2 = split(chamfer2_piece_2, bisect_by=Plane(origin=(-1.33112514, 4.840737771, -3.323678627), z_dir=(0.6935688530644915, -0.6606278948920248, 0.2872856253788866)), keep=Keep.TOP, mode=Mode.PRIVATE)
    chamfer2_piece_2 = split(chamfer2_piece_2, bisect_by=Plane(origin=(-2.683226401, 6.128621167, -2.902135893), z_dir=(0.6935688530644915, -0.6606278948920248, -0.2872856253788866)), keep=Keep.TOP, mode=Mode.PRIVATE)
    chamfer2_piece_2 = split(chamfer2_piece_2, bisect_by=Plane(origin=(-1.385498006, 4.658527335, -3.280105928), z_dir=(0.29935289973153084, -0.905966711775134, 0.29935289973153045)), keep=Keep.TOP, mode=Mode.PRIVATE)
    chamfer2_piece_2 = split(chamfer2_piece_2, bisect_by=Plane(origin=(-1.993594751, 6.498881677, -2.897670526), z_dir=(0.2993528997315294, -0.9059667117751339, -0.2993528997315318)), keep=Keep.TOP, mode=Mode.PRIVATE)
    add(chamfer2_piece_2)
    with BuildSketch(Plane(origin=(-3.3929366, 5, 1.498328678), x_dir=(0, 0, 1), z_dir=(1, 0, 0))) as chamfer2_piece_3_section:
        Polygon((CHAMFER2_SIZE, 0), (0, -CHAMFER2_SIZE_2), (0, 0), align=None)
    chamfer2_piece_3 = extrude(amount=6.785873199, mode=Mode.PRIVATE)
    chamfer2_piece_3 = split(chamfer2_piece_3, bisect_by=Plane(origin=(-2.902135893, 6.128621167, 2.683226401), z_dir=(-0.2872856253788866, -0.6606278948920248, -0.6935688530644915)), keep=Keep.TOP, mode=Mode.PRIVATE)
    chamfer2_piece_3 = split(chamfer2_piece_3, bisect_by=Plane(origin=(-0.829751772, 7.441446714, 2.560034596), z_dir=(-0.6935688530644915, -0.6606278948920248, -0.2872856253788866)), keep=Keep.TOP, mode=Mode.PRIVATE)
    chamfer2_piece_3 = split(chamfer2_piece_3, bisect_by=Plane(origin=(-3.323678627, 4.840737771, 1.33112514), z_dir=(0.2872856253788866, -0.6606278948920248, -0.6935688530644915)), keep=Keep.TOP, mode=Mode.PRIVATE)
    chamfer2_piece_3 = split(chamfer2_piece_3, bisect_by=Plane(origin=(-2.691860225, 4.332221152, 1.207933335), z_dir=(0.6935688530644915, -0.6606278948920248, -0.2872856253788866)), keep=Keep.TOP, mode=Mode.PRIVATE)
    chamfer2_piece_3 = split(chamfer2_piece_3, bisect_by=Plane(origin=(-3.280105928, 4.658527335, 1.385498006), z_dir=(0.2993528997315294, -0.9059667117751339, -0.2993528997315318)), keep=Keep.TOP, mode=Mode.PRIVATE)
    chamfer2_piece_3 = split(chamfer2_piece_3, bisect_by=Plane(origin=(-2.897670526, 6.498881677, 1.993594751), z_dir=(-0.299352899731533, -0.9059667117751338, -0.2993528997315284)), keep=Keep.TOP, mode=Mode.PRIVATE)
    add(chamfer2_piece_3)
    with BuildSketch(Plane(origin=(1.339690109, 5, -3.458646846), x_dir=(-0.707106781186548, 0, -0.707106781186547), z_dir=(-0.707106781186547, 0, 0.707106781186548))) as chamfer2_piece_4_section:
        Polygon((CHAMFER2_SIZE, 0), (0, -CHAMFER2_SIZE_2), (0, 0), align=None)
    chamfer2_piece_4 = extrude(amount=6.785873199, mode=Mode.PRIVATE)
    chamfer2_piece_4 = split(chamfer2_piece_4, bisect_by=Plane(origin=(1.408948083, 4.840737771, -3.291443308), z_dir=(0.2872856253788866, -0.6606278948920248, 0.6935688530644915)), keep=Keep.TOP, mode=Mode.PRIVATE)
    chamfer2_piece_4 = split(chamfer2_piece_4, bisect_by=Plane(origin=(1.049294767, 4.332221152, -2.757570472), z_dir=(-0.2872856253788866, -0.6606278948920248, 0.6935688530644915)), keep=Keep.TOP, mode=Mode.PRIVATE)
    chamfer2_piece_4 = split(chamfer2_piece_4, bisect_by=Plane(origin=(0.154792386, 6.128621167, -3.949447553), z_dir=(0.6935688530644915, -0.6606278948920248, 0.2872856253788866)), keep=Keep.TOP, mode=Mode.PRIVATE)
    chamfer2_piece_4 = split(chamfer2_piece_4, bisect_by=Plane(origin=(-1.223494718, 7.441446714, -2.396940928), z_dir=(0.6935688530644915, -0.6606278948920248, -0.2872856253788866)), keep=Keep.TOP, mode=Mode.PRIVATE)
    chamfer2_piece_4 = split(chamfer2_piece_4, bisect_by=Plane(origin=(1.339690109, 4.658527335, -3.29908018), z_dir=(2.499143709787781e-15, -0.9059667117751339, 0.4233489307360439)), keep=Keep.TOP, mode=Mode.PRIVATE)
    chamfer2_piece_4 = split(chamfer2_piece_4, bisect_by=Plane(origin=(0.639278111, 6.498881677, -3.458646846), z_dir=(0.42334893073604385, -0.9059667117751339, -1.0602427859705562e-15)), keep=Keep.TOP, mode=Mode.PRIVATE)
    add(chamfer2_piece_4)
    with BuildSketch(Plane(origin=(3.3929366, 5, -1.498328678), x_dir=(0, 0, -1), z_dir=(-1, 0, 0))) as chamfer2_piece_5_section:
        Polygon((CHAMFER2_SIZE, 0), (0, -CHAMFER2_SIZE_2), (0, 0), align=None)
    chamfer2_piece_5 = extrude(amount=6.785873199, mode=Mode.PRIVATE)
    chamfer2_piece_5 = split(chamfer2_piece_5, bisect_by=Plane(origin=(2.691860225, 4.332221152, -1.207933335), z_dir=(-0.6935688530644915, -0.6606278948920248, 0.2872856253788866)), keep=Keep.TOP, mode=Mode.PRIVATE)
    chamfer2_piece_5 = split(chamfer2_piece_5, bisect_by=Plane(origin=(2.902135893, 6.128621167, -2.683226401), z_dir=(0.2872856253788866, -0.6606278948920248, 0.6935688530644915)), keep=Keep.TOP, mode=Mode.PRIVATE)
    chamfer2_piece_5 = split(chamfer2_piece_5, bisect_by=Plane(origin=(3.323678627, 4.840737771, -1.33112514), z_dir=(-0.2872856253788866, -0.6606278948920248, 0.6935688530644915)), keep=Keep.TOP, mode=Mode.PRIVATE)
    chamfer2_piece_5 = split(chamfer2_piece_5, bisect_by=Plane(origin=(0.829751772, 7.441446714, -2.560034596), z_dir=(0.6935688530644915, -0.6606278948920248, 0.2872856253788866)), keep=Keep.TOP, mode=Mode.PRIVATE)
    chamfer2_piece_5 = split(chamfer2_piece_5, bisect_by=Plane(origin=(2.897670526, 6.498881677, -1.993594751), z_dir=(0.29935289973153084, -0.905966711775134, 0.29935289973153045)), keep=Keep.TOP, mode=Mode.PRIVATE)
    chamfer2_piece_5 = split(chamfer2_piece_5, bisect_by=Plane(origin=(3.280105928, 4.658527335, -1.385498006), z_dir=(-0.2993528997315273, -0.905966711775134, 0.299352899731534)), keep=Keep.TOP, mode=Mode.PRIVATE)
    add(chamfer2_piece_5)
    with BuildSketch(Plane(origin=(3.458646846, 5, 1.339690109), x_dir=(0.7071067811865396, 0, -0.7071067811865555), z_dir=(-0.7071067811865555, 0, -0.7071067811865397))) as chamfer2_piece_6_section:
        Polygon((CHAMFER2_SIZE, 0), (0, -CHAMFER2_SIZE_2), (0, 0), align=None)
    chamfer2_piece_6 = extrude(amount=6.785873199, mode=Mode.PRIVATE)
    chamfer2_piece_6 = split(chamfer2_piece_6, bisect_by=Plane(origin=(2.757570472, 4.332221152, 1.049294767), z_dir=(-0.6935688530644915, -0.6606278948920248, -0.2872856253788866)), keep=Keep.TOP, mode=Mode.PRIVATE)
    chamfer2_piece_6 = split(chamfer2_piece_6, bisect_by=Plane(origin=(3.291443308, 4.840737771, 1.408948083), z_dir=(-0.6935688530644915, -0.6606278948920248, 0.2872856253788866)), keep=Keep.TOP, mode=Mode.PRIVATE)
    chamfer2_piece_6 = split(chamfer2_piece_6, bisect_by=Plane(origin=(2.396940928, 7.441446714, -1.223494718), z_dir=(0.2872856253788866, -0.6606278948920248, 0.6935688530644915)), keep=Keep.TOP, mode=Mode.PRIVATE)
    chamfer2_piece_6 = split(chamfer2_piece_6, bisect_by=Plane(origin=(3.949447553, 6.128621167, 0.154792386), z_dir=(-0.2872856253788866, -0.6606278948920248, 0.6935688530644915)), keep=Keep.TOP, mode=Mode.PRIVATE)
    chamfer2_piece_6 = split(chamfer2_piece_6, bisect_by=Plane(origin=(3.458646846, 6.498881677, 0.639278111), z_dir=(2.499143709787781e-15, -0.9059667117751339, 0.4233489307360439)), keep=Keep.TOP, mode=Mode.PRIVATE)
    chamfer2_piece_6 = split(chamfer2_piece_6, bisect_by=Plane(origin=(3.29908018, 4.658527335, 1.339690109), z_dir=(-0.42334893073604385, -0.9059667117751339, 4.013776261174247e-15)), keep=Keep.TOP, mode=Mode.PRIVATE)
    add(chamfer2_piece_6)
    with BuildSketch(Plane(origin=(1.498328678, 5, 3.3929366), x_dir=(1, 0, 0), z_dir=(0, 0, -1))) as chamfer2_piece_7_section:
        Polygon((CHAMFER2_SIZE, 0), (0, -CHAMFER2_SIZE_2), (0, 0), align=None)
    chamfer2_piece_7 = extrude(amount=6.785873199, mode=Mode.PRIVATE)
    chamfer2_piece_7 = split(chamfer2_piece_7, bisect_by=Plane(origin=(1.207933335, 4.332221152, 2.691860225), z_dir=(-0.2872856253788866, -0.6606278948920248, -0.6935688530644915)), keep=Keep.TOP, mode=Mode.PRIVATE)
    chamfer2_piece_7 = split(chamfer2_piece_7, bisect_by=Plane(origin=(1.33112514, 4.840737771, 3.323678627), z_dir=(-0.6935688530644915, -0.6606278948920248, -0.2872856253788866)), keep=Keep.TOP, mode=Mode.PRIVATE)
    chamfer2_piece_7 = split(chamfer2_piece_7, bisect_by=Plane(origin=(2.683226401, 6.128621167, 2.902135893), z_dir=(-0.6935688530644915, -0.6606278948920248, 0.2872856253788866)), keep=Keep.TOP, mode=Mode.PRIVATE)
    chamfer2_piece_7 = split(chamfer2_piece_7, bisect_by=Plane(origin=(2.560034596, 7.441446714, 0.829751772), z_dir=(-0.2872856253788866, -0.6606278948920248, 0.6935688530644915)), keep=Keep.TOP, mode=Mode.PRIVATE)
    chamfer2_piece_7 = split(chamfer2_piece_7, bisect_by=Plane(origin=(1.385498006, 4.658527335, 3.280105928), z_dir=(-0.299352899731533, -0.9059667117751338, -0.2993528997315284)), keep=Keep.TOP, mode=Mode.PRIVATE)
    chamfer2_piece_7 = split(chamfer2_piece_7, bisect_by=Plane(origin=(1.993594751, 6.498881677, 2.897670526), z_dir=(-0.2993528997315273, -0.905966711775134, 0.299352899731534)), keep=Keep.TOP, mode=Mode.PRIVATE)
    add(chamfer2_piece_7)
    with BuildSketch(Plane(origin=(-1.339690109, 5, 3.458646846), x_dir=(0.707106781186553, 0, 0.7071067811865421), z_dir=(0.7071067811865421, 0, -0.7071067811865529))) as chamfer2_piece_8_section:
        Polygon((CHAMFER2_SIZE, 0), (0, -CHAMFER2_SIZE_2), (0, 0), align=None)
    chamfer2_piece_8 = extrude(amount=6.785873199, mode=Mode.PRIVATE)
    chamfer2_piece_8 = split(chamfer2_piece_8, bisect_by=Plane(origin=(-1.408948083, 4.840737771, 3.291443308), z_dir=(-0.2872856253788866, -0.6606278948920248, -0.6935688530644915)), keep=Keep.TOP, mode=Mode.PRIVATE)
    chamfer2_piece_8 = split(chamfer2_piece_8, bisect_by=Plane(origin=(-0.154792386, 6.128621167, 3.949447553), z_dir=(-0.6935688530644915, -0.6606278948920248, -0.2872856253788866)), keep=Keep.TOP, mode=Mode.PRIVATE)
    chamfer2_piece_8 = split(chamfer2_piece_8, bisect_by=Plane(origin=(-1.049294767, 4.332221152, 2.757570472), z_dir=(0.2872856253788866, -0.6606278948920248, -0.6935688530644915)), keep=Keep.TOP, mode=Mode.PRIVATE)
    chamfer2_piece_8 = split(chamfer2_piece_8, bisect_by=Plane(origin=(1.223494718, 7.441446714, 2.396940928), z_dir=(-0.6935688530644915, -0.6606278948920248, 0.2872856253788866)), keep=Keep.TOP, mode=Mode.PRIVATE)
    chamfer2_piece_8 = split(chamfer2_piece_8, bisect_by=Plane(origin=(-1.339690109, 4.658527335, 3.29908018), z_dir=(-2.49914370978774e-15, -0.9059667117751338, -0.42334893073604396)), keep=Keep.TOP, mode=Mode.PRIVATE)
    chamfer2_piece_8 = split(chamfer2_piece_8, bisect_by=Plane(origin=(-0.639278111, 6.498881677, 3.458646846), z_dir=(-0.42334893073604385, -0.9059667117751339, 4.013776261174247e-15)), keep=Keep.TOP, mode=Mode.PRIVATE)
    add(chamfer2_piece_8)


with BuildPart() as part_1:
    # Scale1: scaled about (0, 0, 0)
    add(part.part.scale((SCALE1_SCALE_X, SCALE1_SCALE_Y, SCALE1_SCALE_Z), about=(0, 0, 0)))

    # Sketch4 → Cut-Extrude1 (cut, through all)
    with BuildSketch(Plane.XZ):
        Circle(SKETCH4_R)
        with Locations(Location((0, 0, 0), (0, 0, 270))):
            Circle(SKETCH4_R_2, mode=Mode.SUBTRACT)
    extrude(amount=-CUT_EXTRUDE1_DEPTH, mode=Mode.SUBTRACT)


solid = part_1.part
